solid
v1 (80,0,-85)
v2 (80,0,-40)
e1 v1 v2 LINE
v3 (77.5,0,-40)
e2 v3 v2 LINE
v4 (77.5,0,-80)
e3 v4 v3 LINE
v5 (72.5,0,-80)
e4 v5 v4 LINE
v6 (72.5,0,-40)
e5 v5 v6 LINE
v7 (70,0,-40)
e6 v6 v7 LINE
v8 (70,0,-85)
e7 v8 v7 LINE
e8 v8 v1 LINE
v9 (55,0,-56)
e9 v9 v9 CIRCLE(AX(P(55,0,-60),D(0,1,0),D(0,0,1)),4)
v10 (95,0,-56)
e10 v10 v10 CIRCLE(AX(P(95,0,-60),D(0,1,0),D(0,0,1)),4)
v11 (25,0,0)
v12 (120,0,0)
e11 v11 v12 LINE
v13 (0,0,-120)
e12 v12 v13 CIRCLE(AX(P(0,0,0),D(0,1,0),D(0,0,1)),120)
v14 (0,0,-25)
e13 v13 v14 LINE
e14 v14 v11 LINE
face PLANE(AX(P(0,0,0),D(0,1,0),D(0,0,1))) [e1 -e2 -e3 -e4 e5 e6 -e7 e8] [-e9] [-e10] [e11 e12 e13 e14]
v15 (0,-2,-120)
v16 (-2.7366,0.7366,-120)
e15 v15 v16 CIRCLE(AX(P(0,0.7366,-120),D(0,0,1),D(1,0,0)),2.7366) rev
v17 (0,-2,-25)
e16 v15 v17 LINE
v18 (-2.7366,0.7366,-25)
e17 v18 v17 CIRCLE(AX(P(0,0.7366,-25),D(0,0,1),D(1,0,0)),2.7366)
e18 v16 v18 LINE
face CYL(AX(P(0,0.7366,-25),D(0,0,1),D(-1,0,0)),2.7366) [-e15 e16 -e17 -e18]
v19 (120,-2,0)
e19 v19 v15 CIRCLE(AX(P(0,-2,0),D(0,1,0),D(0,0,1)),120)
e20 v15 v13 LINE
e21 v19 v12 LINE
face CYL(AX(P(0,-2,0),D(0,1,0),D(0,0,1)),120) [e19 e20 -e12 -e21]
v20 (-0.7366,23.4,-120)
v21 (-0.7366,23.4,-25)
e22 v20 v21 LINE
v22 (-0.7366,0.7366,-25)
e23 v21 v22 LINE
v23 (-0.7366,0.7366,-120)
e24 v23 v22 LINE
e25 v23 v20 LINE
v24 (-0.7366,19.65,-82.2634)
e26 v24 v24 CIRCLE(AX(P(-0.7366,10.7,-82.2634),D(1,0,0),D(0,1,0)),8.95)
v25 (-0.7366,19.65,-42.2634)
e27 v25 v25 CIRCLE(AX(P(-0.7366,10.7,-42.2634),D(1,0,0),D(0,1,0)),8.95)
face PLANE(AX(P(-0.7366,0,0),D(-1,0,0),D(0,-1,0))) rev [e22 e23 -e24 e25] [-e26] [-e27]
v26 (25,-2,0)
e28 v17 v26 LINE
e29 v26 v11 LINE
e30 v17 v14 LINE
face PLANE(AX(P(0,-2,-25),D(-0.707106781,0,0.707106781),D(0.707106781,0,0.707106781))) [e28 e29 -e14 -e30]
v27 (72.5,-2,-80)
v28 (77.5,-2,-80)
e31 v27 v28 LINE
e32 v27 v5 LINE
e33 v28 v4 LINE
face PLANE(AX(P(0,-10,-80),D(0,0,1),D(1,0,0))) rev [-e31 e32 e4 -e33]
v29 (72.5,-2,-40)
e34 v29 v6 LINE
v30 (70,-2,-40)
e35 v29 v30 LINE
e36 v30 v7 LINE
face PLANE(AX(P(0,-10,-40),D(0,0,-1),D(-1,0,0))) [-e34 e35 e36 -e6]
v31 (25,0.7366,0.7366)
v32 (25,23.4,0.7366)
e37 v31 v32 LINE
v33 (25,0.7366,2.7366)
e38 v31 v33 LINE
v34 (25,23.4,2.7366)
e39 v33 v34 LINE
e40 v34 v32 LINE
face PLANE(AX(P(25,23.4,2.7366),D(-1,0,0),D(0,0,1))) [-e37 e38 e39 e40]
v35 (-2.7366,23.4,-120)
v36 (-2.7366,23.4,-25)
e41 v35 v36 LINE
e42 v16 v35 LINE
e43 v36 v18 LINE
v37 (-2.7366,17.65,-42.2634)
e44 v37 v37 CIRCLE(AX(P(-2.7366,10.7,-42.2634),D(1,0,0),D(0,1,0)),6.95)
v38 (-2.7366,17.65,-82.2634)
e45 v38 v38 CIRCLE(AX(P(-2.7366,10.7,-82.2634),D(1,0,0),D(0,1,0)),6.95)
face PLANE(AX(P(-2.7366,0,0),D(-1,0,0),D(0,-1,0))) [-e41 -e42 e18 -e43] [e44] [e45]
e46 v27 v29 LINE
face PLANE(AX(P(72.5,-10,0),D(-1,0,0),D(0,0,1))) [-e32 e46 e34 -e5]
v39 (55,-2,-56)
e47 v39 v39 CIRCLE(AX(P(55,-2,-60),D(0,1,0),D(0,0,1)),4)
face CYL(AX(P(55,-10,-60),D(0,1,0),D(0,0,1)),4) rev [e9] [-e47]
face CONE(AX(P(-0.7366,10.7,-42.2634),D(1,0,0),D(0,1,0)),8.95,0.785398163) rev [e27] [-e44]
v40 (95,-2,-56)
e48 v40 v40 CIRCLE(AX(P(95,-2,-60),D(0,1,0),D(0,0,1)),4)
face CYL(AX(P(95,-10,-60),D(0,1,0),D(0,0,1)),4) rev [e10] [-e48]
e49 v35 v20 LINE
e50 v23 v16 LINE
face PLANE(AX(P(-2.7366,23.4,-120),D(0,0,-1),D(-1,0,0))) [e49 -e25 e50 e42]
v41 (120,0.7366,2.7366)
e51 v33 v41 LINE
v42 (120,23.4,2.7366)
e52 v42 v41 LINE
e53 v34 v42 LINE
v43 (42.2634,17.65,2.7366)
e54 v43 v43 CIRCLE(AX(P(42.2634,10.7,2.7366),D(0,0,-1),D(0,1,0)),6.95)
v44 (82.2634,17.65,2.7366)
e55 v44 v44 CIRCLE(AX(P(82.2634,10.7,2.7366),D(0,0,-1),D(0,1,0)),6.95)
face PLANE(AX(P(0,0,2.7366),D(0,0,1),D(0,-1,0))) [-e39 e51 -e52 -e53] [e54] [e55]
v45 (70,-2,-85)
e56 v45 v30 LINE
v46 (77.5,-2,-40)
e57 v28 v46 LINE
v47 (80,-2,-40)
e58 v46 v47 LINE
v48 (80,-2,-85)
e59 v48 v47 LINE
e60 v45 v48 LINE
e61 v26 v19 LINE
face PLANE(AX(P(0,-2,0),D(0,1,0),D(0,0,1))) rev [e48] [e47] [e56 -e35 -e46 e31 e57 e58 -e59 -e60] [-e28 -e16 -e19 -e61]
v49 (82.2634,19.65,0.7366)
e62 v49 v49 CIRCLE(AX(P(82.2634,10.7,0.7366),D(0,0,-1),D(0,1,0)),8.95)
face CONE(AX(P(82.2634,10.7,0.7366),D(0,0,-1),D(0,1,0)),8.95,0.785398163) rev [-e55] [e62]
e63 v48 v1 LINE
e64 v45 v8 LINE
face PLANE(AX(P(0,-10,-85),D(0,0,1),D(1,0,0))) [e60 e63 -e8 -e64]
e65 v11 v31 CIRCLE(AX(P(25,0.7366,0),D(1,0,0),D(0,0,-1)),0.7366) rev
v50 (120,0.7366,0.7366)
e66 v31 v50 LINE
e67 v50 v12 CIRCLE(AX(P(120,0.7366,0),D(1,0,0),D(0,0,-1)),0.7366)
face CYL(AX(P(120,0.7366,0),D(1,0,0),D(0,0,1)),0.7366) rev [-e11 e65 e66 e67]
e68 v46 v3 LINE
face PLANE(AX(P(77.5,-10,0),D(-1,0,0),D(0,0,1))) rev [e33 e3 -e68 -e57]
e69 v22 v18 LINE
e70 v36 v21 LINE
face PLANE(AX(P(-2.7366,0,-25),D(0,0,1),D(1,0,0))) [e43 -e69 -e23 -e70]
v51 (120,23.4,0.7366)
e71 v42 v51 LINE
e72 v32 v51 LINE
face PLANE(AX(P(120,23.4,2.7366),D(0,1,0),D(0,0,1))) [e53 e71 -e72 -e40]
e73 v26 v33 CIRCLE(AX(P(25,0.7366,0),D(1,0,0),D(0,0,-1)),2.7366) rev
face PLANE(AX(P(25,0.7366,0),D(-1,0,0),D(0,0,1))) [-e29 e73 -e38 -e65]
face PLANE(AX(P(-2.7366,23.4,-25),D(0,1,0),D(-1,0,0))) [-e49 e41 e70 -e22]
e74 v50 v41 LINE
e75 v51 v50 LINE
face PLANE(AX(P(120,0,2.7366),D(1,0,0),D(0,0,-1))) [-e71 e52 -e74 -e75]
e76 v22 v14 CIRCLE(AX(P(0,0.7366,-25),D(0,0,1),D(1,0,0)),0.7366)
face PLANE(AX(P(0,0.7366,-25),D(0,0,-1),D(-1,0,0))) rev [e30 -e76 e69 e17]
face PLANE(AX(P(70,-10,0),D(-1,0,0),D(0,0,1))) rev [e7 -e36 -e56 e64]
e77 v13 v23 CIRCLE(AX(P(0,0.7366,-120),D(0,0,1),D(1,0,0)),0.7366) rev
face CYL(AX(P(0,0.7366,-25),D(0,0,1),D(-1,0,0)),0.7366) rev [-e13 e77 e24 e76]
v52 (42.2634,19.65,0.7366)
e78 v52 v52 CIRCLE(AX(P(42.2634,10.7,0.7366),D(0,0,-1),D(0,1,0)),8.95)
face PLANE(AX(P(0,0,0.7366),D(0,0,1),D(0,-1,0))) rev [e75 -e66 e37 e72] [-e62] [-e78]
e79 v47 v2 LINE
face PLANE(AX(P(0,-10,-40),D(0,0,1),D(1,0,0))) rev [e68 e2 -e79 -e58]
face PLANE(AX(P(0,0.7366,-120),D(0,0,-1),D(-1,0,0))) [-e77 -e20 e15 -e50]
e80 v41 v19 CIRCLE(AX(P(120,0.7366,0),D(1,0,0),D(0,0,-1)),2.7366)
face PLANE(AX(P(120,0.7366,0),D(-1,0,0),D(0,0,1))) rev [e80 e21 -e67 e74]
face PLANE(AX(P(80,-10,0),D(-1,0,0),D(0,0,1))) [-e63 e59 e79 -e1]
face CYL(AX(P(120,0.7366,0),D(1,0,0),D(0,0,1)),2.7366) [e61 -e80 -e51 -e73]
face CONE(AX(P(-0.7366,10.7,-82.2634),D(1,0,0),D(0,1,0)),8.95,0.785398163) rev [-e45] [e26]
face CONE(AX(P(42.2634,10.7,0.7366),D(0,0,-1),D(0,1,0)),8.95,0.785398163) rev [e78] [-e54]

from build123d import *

# Parameters (mm, degrees)
BRIDA_BASE1_DEPTH               = 2
BRIDA_DE_ARISTA1_DEPTH          = 95
BRIDA_DE_ARISTA2_DEPTH          = 95
CROQUIS16_R                     = 4
CORTAR_EXTRUIR3_DEPTH           = 10
CROQUIS17_R                     = 8.95
CORTAR_EXTRUIR5_DEPTH           = 2
CORTAR_EXTRUIR5_DRAFT           = -45
CORTAR_EXTRUIR5_PROFILE_2_DEPTH = 2
CORTAR_EXTRUIR5_PROFILE_2_DRAFT = -45
CROQUIS18_R                     = 8.95
CORTAR_EXTRUIR6_DEPTH           = 2
CORTAR_EXTRUIR6_DRAFT           = -45
CORTAR_EXTRUIR6_PROFILE_2_DEPTH = 2
CORTAR_EXTRUIR6_PROFILE_2_DRAFT = -45


# Sheet-metal steps are written as plain solids
with BuildPart() as part:
    # Croquis1 → Brida base1 (new body)
    with BuildSketch(Plane(origin=(0, 0, 0), x_dir=(1, 0, 0), z_dir=(0, 1, 0))):
        with BuildLine():
            Line((0, 25), (25, 0))
            Line((25, 0), (120, 0))
            ThreePointArc((120, 0), (84.852813742, 84.852813742), (0, 120))
            Line((0, 120), (0, 25))
        make_face()
    extrude(amount=-BRIDA_BASE1_DEPTH)

    # Brida de arista1 section (across the edge) → Brida de arista1 (add)
    with BuildSketch(Plane(origin=(25, 0, 0.7366), x_dir=(0, 0, -1), z_dir=(1, 0, 0))):
        with BuildLine():
            Line((-2, 0.7366), (-2, 23.4))
            Line((-2, 23.4), (0, 23.4))
            Line((0, 23.4), (0, 0.7366))
            ThreePointArc((0, 0.7366), (0.215745145, 0.215745145), (0.7366, 0))
            Line((0.7366, 0), (0.7366, -2))
            ThreePointArc((0.7366, -2), (-1.198468417, -1.198468417), (-2, 0.7366))
        make_face()
    extrude(amount=BRIDA_DE_ARISTA1_DEPTH)

    # Brida de arista2 section (across the edge) → Brida de arista2 (add)
    with BuildSketch(Plane(origin=(-0.7366, 0, -120), x_dir=(1, 0, 0), z_dir=(0, 0, 1))):
        with BuildLine():
            Line((-2, 0.7366), (-2, 23.4))
            Line((-2, 23.4), (0, 23.4))
            Line((0, 23.4), (0, 0.7366))
            ThreePointArc((0, 0.7366), (0.215745145, 0.215745145), (0.7366, 0))
            Line((0.7366, 0), (0.7366, -2))
            ThreePointArc((0.7366, -2), (-1.198468417, -1.198468417), (-2, 0.7366))
        make_face()
    extrude(amount=BRIDA_DE_ARISTA2_DEPTH)

    # Croquis16 → Cortar-Extruir3 (cut)
    with BuildSketch(Plane(origin=(0, 0, 0), x_dir=(1, 0, 0), z_dir=(0, 1, 0))):
        with Locations(Location((55, 60, 0), (0, 0, 270))):
            Circle(CROQUIS16_R)
        with Locations(Location((95, 60, 0), (0, 0, 270))):
            Circle(CROQUIS16_R)
        Polygon((70, 40), (72.5, 40), (72.5, 80), (77.5, 80), (77.5, 40), (80, 40), (80, 85), (70, 85), align=None)
    extrude(amount=-CORTAR_EXTRUIR3_DEPTH, mode=Mode.SUBTRACT)


with BuildPart() as cortar_extruir5_tool:
    # Croquis17 → Cortar-Extruir5 (with draft: the straight prism first)
    with BuildSketch(Plane(origin=(0, 0, 0.7366), x_dir=(-1, 0, 0), z_dir=(0, 0, -1))):
        with Locations((-42.2634, 10.7)):
            Circle(CROQUIS17_R)
    extrude(amount=-CORTAR_EXTRUIR5_DEPTH)
    # Cortar-Extruir5: the draft: its side faces are tilted about the plane it starts from
    cortar_extruir5_sides = [cortar_extruir5_tool.faces().sort_by_distance(p)[0] for p in [
        (51.2134, 10.7, 1.7366),
    ]]
    draft(cortar_extruir5_sides, Plane(origin=(0, 0, 0.7366), x_dir=(-1, 0, 0), z_dir=(0, 0, -1)), CORTAR_EXTRUIR5_DRAFT)


with BuildPart() as part_1:
    add(part.part)

    # Cortar-Extruir5: cut by cortar_extruir5_tool
    add(cortar_extruir5_tool.part, mode=Mode.SUBTRACT)


with BuildPart() as cortar_extruir5_profile_2_tool:
    # Croquis17 → Cortar-Extruir5 profile 2 (with draft: the straight prism first)
    with BuildSketch(Plane(origin=(0, 0, 0.7366), x_dir=(-1, 0, 0), z_dir=(0, 0, -1))):
        with Locations((-82.2634, 10.7)):
            Circle(CROQUIS17_R)
    extrude(amount=-CORTAR_EXTRUIR5_PROFILE_2_DEPTH)
    # Cortar-Extruir5 profile 2: the draft: its side faces are tilted about the plane it starts from
    cortar_extruir5_profile_2_sides = [cortar_extruir5_profile_2_tool.faces().sort_by_distance(p)[0] for p in [
        (91.2134, 10.7, 1.7366),
    ]]
    draft(cortar_extruir5_profile_2_sides, Plane(origin=(0, 0, 0.7366), x_dir=(-1, 0, 0), z_dir=(0, 0, -1)), CORTAR_EXTRUIR5_PROFILE_2_DRAFT)


with BuildPart() as part_2:
    add(part_1.part)

    # Cortar-Extruir5 profile 2: cut by cortar_extruir5_profile_2_tool
    add(cortar_extruir5_profile_2_tool.part, mode=Mode.SUBTRACT)


with BuildPart() as cortar_extruir6_tool:
    # Croquis18 → Cortar-Extruir6 (with draft: the straight prism first)
    with BuildSketch(Plane(origin=(-0.7366, 0, 0), x_dir=(0, 0, -1), z_dir=(1, 0, 0))):
        with Locations((42.2634, 10.7)):
            Circle(CROQUIS18_R)
    extrude(amount=-CORTAR_EXTRUIR6_DEPTH)
    # Cortar-Extruir6: the draft: its side faces are tilted about the plane it starts from
    cortar_extruir6_sides = [cortar_extruir6_tool.faces().sort_by_distance(p)[0] for p in [
        (-1.7366, 10.7, -33.3134),
    ]]
    draft(cortar_extruir6_sides, Plane(origin=(-0.7366, 0, 0), x_dir=(0, 0, -1), z_dir=(1, 0, 0)), CORTAR_EXTRUIR6_DRAFT)


with BuildPart() as part_3:
    add(part_2.part)

    # Cortar-Extruir6: cut by cortar_extruir6_tool
    add(cortar_extruir6_tool.part, mode=Mode.SUBTRACT)


with BuildPart() as cortar_extruir6_profile_2_tool:
    # Croquis18 → Cortar-Extruir6 profile 2 (with draft: the straight prism first)
    with BuildSketch(Plane(origin=(-0.7366, 0, 0), x_dir=(0, 0, -1), z_dir=(1, 0, 0))):
        with Locations((82.2634, 10.7)):
            Circle(CROQUIS18_R)
    extrude(amount=-CORTAR_EXTRUIR6_PROFILE_2_DEPTH)
    # Cortar-Extruir6 profile 2: the draft: its side faces are tilted about the plane it starts from
    cortar_extruir6_profile_2_sides = [cortar_extruir6_profile_2_tool.faces().sort_by_distance(p)[0] for p in [
        (-1.7366, 10.7, -73.3134),
    ]]
    draft(cortar_extruir6_profile_2_sides, Plane(origin=(-0.7366, 0, 0), x_dir=(0, 0, -1), z_dir=(1, 0, 0)), CORTAR_EXTRUIR6_PROFILE_2_DRAFT)


with BuildPart() as part_4:
    add(part_3.part)

    # Cortar-Extruir6 profile 2: cut by cortar_extruir6_profile_2_tool
    add(cortar_extruir6_profile_2_tool.part, mode=Mode.SUBTRACT)


solid = part_4.part
